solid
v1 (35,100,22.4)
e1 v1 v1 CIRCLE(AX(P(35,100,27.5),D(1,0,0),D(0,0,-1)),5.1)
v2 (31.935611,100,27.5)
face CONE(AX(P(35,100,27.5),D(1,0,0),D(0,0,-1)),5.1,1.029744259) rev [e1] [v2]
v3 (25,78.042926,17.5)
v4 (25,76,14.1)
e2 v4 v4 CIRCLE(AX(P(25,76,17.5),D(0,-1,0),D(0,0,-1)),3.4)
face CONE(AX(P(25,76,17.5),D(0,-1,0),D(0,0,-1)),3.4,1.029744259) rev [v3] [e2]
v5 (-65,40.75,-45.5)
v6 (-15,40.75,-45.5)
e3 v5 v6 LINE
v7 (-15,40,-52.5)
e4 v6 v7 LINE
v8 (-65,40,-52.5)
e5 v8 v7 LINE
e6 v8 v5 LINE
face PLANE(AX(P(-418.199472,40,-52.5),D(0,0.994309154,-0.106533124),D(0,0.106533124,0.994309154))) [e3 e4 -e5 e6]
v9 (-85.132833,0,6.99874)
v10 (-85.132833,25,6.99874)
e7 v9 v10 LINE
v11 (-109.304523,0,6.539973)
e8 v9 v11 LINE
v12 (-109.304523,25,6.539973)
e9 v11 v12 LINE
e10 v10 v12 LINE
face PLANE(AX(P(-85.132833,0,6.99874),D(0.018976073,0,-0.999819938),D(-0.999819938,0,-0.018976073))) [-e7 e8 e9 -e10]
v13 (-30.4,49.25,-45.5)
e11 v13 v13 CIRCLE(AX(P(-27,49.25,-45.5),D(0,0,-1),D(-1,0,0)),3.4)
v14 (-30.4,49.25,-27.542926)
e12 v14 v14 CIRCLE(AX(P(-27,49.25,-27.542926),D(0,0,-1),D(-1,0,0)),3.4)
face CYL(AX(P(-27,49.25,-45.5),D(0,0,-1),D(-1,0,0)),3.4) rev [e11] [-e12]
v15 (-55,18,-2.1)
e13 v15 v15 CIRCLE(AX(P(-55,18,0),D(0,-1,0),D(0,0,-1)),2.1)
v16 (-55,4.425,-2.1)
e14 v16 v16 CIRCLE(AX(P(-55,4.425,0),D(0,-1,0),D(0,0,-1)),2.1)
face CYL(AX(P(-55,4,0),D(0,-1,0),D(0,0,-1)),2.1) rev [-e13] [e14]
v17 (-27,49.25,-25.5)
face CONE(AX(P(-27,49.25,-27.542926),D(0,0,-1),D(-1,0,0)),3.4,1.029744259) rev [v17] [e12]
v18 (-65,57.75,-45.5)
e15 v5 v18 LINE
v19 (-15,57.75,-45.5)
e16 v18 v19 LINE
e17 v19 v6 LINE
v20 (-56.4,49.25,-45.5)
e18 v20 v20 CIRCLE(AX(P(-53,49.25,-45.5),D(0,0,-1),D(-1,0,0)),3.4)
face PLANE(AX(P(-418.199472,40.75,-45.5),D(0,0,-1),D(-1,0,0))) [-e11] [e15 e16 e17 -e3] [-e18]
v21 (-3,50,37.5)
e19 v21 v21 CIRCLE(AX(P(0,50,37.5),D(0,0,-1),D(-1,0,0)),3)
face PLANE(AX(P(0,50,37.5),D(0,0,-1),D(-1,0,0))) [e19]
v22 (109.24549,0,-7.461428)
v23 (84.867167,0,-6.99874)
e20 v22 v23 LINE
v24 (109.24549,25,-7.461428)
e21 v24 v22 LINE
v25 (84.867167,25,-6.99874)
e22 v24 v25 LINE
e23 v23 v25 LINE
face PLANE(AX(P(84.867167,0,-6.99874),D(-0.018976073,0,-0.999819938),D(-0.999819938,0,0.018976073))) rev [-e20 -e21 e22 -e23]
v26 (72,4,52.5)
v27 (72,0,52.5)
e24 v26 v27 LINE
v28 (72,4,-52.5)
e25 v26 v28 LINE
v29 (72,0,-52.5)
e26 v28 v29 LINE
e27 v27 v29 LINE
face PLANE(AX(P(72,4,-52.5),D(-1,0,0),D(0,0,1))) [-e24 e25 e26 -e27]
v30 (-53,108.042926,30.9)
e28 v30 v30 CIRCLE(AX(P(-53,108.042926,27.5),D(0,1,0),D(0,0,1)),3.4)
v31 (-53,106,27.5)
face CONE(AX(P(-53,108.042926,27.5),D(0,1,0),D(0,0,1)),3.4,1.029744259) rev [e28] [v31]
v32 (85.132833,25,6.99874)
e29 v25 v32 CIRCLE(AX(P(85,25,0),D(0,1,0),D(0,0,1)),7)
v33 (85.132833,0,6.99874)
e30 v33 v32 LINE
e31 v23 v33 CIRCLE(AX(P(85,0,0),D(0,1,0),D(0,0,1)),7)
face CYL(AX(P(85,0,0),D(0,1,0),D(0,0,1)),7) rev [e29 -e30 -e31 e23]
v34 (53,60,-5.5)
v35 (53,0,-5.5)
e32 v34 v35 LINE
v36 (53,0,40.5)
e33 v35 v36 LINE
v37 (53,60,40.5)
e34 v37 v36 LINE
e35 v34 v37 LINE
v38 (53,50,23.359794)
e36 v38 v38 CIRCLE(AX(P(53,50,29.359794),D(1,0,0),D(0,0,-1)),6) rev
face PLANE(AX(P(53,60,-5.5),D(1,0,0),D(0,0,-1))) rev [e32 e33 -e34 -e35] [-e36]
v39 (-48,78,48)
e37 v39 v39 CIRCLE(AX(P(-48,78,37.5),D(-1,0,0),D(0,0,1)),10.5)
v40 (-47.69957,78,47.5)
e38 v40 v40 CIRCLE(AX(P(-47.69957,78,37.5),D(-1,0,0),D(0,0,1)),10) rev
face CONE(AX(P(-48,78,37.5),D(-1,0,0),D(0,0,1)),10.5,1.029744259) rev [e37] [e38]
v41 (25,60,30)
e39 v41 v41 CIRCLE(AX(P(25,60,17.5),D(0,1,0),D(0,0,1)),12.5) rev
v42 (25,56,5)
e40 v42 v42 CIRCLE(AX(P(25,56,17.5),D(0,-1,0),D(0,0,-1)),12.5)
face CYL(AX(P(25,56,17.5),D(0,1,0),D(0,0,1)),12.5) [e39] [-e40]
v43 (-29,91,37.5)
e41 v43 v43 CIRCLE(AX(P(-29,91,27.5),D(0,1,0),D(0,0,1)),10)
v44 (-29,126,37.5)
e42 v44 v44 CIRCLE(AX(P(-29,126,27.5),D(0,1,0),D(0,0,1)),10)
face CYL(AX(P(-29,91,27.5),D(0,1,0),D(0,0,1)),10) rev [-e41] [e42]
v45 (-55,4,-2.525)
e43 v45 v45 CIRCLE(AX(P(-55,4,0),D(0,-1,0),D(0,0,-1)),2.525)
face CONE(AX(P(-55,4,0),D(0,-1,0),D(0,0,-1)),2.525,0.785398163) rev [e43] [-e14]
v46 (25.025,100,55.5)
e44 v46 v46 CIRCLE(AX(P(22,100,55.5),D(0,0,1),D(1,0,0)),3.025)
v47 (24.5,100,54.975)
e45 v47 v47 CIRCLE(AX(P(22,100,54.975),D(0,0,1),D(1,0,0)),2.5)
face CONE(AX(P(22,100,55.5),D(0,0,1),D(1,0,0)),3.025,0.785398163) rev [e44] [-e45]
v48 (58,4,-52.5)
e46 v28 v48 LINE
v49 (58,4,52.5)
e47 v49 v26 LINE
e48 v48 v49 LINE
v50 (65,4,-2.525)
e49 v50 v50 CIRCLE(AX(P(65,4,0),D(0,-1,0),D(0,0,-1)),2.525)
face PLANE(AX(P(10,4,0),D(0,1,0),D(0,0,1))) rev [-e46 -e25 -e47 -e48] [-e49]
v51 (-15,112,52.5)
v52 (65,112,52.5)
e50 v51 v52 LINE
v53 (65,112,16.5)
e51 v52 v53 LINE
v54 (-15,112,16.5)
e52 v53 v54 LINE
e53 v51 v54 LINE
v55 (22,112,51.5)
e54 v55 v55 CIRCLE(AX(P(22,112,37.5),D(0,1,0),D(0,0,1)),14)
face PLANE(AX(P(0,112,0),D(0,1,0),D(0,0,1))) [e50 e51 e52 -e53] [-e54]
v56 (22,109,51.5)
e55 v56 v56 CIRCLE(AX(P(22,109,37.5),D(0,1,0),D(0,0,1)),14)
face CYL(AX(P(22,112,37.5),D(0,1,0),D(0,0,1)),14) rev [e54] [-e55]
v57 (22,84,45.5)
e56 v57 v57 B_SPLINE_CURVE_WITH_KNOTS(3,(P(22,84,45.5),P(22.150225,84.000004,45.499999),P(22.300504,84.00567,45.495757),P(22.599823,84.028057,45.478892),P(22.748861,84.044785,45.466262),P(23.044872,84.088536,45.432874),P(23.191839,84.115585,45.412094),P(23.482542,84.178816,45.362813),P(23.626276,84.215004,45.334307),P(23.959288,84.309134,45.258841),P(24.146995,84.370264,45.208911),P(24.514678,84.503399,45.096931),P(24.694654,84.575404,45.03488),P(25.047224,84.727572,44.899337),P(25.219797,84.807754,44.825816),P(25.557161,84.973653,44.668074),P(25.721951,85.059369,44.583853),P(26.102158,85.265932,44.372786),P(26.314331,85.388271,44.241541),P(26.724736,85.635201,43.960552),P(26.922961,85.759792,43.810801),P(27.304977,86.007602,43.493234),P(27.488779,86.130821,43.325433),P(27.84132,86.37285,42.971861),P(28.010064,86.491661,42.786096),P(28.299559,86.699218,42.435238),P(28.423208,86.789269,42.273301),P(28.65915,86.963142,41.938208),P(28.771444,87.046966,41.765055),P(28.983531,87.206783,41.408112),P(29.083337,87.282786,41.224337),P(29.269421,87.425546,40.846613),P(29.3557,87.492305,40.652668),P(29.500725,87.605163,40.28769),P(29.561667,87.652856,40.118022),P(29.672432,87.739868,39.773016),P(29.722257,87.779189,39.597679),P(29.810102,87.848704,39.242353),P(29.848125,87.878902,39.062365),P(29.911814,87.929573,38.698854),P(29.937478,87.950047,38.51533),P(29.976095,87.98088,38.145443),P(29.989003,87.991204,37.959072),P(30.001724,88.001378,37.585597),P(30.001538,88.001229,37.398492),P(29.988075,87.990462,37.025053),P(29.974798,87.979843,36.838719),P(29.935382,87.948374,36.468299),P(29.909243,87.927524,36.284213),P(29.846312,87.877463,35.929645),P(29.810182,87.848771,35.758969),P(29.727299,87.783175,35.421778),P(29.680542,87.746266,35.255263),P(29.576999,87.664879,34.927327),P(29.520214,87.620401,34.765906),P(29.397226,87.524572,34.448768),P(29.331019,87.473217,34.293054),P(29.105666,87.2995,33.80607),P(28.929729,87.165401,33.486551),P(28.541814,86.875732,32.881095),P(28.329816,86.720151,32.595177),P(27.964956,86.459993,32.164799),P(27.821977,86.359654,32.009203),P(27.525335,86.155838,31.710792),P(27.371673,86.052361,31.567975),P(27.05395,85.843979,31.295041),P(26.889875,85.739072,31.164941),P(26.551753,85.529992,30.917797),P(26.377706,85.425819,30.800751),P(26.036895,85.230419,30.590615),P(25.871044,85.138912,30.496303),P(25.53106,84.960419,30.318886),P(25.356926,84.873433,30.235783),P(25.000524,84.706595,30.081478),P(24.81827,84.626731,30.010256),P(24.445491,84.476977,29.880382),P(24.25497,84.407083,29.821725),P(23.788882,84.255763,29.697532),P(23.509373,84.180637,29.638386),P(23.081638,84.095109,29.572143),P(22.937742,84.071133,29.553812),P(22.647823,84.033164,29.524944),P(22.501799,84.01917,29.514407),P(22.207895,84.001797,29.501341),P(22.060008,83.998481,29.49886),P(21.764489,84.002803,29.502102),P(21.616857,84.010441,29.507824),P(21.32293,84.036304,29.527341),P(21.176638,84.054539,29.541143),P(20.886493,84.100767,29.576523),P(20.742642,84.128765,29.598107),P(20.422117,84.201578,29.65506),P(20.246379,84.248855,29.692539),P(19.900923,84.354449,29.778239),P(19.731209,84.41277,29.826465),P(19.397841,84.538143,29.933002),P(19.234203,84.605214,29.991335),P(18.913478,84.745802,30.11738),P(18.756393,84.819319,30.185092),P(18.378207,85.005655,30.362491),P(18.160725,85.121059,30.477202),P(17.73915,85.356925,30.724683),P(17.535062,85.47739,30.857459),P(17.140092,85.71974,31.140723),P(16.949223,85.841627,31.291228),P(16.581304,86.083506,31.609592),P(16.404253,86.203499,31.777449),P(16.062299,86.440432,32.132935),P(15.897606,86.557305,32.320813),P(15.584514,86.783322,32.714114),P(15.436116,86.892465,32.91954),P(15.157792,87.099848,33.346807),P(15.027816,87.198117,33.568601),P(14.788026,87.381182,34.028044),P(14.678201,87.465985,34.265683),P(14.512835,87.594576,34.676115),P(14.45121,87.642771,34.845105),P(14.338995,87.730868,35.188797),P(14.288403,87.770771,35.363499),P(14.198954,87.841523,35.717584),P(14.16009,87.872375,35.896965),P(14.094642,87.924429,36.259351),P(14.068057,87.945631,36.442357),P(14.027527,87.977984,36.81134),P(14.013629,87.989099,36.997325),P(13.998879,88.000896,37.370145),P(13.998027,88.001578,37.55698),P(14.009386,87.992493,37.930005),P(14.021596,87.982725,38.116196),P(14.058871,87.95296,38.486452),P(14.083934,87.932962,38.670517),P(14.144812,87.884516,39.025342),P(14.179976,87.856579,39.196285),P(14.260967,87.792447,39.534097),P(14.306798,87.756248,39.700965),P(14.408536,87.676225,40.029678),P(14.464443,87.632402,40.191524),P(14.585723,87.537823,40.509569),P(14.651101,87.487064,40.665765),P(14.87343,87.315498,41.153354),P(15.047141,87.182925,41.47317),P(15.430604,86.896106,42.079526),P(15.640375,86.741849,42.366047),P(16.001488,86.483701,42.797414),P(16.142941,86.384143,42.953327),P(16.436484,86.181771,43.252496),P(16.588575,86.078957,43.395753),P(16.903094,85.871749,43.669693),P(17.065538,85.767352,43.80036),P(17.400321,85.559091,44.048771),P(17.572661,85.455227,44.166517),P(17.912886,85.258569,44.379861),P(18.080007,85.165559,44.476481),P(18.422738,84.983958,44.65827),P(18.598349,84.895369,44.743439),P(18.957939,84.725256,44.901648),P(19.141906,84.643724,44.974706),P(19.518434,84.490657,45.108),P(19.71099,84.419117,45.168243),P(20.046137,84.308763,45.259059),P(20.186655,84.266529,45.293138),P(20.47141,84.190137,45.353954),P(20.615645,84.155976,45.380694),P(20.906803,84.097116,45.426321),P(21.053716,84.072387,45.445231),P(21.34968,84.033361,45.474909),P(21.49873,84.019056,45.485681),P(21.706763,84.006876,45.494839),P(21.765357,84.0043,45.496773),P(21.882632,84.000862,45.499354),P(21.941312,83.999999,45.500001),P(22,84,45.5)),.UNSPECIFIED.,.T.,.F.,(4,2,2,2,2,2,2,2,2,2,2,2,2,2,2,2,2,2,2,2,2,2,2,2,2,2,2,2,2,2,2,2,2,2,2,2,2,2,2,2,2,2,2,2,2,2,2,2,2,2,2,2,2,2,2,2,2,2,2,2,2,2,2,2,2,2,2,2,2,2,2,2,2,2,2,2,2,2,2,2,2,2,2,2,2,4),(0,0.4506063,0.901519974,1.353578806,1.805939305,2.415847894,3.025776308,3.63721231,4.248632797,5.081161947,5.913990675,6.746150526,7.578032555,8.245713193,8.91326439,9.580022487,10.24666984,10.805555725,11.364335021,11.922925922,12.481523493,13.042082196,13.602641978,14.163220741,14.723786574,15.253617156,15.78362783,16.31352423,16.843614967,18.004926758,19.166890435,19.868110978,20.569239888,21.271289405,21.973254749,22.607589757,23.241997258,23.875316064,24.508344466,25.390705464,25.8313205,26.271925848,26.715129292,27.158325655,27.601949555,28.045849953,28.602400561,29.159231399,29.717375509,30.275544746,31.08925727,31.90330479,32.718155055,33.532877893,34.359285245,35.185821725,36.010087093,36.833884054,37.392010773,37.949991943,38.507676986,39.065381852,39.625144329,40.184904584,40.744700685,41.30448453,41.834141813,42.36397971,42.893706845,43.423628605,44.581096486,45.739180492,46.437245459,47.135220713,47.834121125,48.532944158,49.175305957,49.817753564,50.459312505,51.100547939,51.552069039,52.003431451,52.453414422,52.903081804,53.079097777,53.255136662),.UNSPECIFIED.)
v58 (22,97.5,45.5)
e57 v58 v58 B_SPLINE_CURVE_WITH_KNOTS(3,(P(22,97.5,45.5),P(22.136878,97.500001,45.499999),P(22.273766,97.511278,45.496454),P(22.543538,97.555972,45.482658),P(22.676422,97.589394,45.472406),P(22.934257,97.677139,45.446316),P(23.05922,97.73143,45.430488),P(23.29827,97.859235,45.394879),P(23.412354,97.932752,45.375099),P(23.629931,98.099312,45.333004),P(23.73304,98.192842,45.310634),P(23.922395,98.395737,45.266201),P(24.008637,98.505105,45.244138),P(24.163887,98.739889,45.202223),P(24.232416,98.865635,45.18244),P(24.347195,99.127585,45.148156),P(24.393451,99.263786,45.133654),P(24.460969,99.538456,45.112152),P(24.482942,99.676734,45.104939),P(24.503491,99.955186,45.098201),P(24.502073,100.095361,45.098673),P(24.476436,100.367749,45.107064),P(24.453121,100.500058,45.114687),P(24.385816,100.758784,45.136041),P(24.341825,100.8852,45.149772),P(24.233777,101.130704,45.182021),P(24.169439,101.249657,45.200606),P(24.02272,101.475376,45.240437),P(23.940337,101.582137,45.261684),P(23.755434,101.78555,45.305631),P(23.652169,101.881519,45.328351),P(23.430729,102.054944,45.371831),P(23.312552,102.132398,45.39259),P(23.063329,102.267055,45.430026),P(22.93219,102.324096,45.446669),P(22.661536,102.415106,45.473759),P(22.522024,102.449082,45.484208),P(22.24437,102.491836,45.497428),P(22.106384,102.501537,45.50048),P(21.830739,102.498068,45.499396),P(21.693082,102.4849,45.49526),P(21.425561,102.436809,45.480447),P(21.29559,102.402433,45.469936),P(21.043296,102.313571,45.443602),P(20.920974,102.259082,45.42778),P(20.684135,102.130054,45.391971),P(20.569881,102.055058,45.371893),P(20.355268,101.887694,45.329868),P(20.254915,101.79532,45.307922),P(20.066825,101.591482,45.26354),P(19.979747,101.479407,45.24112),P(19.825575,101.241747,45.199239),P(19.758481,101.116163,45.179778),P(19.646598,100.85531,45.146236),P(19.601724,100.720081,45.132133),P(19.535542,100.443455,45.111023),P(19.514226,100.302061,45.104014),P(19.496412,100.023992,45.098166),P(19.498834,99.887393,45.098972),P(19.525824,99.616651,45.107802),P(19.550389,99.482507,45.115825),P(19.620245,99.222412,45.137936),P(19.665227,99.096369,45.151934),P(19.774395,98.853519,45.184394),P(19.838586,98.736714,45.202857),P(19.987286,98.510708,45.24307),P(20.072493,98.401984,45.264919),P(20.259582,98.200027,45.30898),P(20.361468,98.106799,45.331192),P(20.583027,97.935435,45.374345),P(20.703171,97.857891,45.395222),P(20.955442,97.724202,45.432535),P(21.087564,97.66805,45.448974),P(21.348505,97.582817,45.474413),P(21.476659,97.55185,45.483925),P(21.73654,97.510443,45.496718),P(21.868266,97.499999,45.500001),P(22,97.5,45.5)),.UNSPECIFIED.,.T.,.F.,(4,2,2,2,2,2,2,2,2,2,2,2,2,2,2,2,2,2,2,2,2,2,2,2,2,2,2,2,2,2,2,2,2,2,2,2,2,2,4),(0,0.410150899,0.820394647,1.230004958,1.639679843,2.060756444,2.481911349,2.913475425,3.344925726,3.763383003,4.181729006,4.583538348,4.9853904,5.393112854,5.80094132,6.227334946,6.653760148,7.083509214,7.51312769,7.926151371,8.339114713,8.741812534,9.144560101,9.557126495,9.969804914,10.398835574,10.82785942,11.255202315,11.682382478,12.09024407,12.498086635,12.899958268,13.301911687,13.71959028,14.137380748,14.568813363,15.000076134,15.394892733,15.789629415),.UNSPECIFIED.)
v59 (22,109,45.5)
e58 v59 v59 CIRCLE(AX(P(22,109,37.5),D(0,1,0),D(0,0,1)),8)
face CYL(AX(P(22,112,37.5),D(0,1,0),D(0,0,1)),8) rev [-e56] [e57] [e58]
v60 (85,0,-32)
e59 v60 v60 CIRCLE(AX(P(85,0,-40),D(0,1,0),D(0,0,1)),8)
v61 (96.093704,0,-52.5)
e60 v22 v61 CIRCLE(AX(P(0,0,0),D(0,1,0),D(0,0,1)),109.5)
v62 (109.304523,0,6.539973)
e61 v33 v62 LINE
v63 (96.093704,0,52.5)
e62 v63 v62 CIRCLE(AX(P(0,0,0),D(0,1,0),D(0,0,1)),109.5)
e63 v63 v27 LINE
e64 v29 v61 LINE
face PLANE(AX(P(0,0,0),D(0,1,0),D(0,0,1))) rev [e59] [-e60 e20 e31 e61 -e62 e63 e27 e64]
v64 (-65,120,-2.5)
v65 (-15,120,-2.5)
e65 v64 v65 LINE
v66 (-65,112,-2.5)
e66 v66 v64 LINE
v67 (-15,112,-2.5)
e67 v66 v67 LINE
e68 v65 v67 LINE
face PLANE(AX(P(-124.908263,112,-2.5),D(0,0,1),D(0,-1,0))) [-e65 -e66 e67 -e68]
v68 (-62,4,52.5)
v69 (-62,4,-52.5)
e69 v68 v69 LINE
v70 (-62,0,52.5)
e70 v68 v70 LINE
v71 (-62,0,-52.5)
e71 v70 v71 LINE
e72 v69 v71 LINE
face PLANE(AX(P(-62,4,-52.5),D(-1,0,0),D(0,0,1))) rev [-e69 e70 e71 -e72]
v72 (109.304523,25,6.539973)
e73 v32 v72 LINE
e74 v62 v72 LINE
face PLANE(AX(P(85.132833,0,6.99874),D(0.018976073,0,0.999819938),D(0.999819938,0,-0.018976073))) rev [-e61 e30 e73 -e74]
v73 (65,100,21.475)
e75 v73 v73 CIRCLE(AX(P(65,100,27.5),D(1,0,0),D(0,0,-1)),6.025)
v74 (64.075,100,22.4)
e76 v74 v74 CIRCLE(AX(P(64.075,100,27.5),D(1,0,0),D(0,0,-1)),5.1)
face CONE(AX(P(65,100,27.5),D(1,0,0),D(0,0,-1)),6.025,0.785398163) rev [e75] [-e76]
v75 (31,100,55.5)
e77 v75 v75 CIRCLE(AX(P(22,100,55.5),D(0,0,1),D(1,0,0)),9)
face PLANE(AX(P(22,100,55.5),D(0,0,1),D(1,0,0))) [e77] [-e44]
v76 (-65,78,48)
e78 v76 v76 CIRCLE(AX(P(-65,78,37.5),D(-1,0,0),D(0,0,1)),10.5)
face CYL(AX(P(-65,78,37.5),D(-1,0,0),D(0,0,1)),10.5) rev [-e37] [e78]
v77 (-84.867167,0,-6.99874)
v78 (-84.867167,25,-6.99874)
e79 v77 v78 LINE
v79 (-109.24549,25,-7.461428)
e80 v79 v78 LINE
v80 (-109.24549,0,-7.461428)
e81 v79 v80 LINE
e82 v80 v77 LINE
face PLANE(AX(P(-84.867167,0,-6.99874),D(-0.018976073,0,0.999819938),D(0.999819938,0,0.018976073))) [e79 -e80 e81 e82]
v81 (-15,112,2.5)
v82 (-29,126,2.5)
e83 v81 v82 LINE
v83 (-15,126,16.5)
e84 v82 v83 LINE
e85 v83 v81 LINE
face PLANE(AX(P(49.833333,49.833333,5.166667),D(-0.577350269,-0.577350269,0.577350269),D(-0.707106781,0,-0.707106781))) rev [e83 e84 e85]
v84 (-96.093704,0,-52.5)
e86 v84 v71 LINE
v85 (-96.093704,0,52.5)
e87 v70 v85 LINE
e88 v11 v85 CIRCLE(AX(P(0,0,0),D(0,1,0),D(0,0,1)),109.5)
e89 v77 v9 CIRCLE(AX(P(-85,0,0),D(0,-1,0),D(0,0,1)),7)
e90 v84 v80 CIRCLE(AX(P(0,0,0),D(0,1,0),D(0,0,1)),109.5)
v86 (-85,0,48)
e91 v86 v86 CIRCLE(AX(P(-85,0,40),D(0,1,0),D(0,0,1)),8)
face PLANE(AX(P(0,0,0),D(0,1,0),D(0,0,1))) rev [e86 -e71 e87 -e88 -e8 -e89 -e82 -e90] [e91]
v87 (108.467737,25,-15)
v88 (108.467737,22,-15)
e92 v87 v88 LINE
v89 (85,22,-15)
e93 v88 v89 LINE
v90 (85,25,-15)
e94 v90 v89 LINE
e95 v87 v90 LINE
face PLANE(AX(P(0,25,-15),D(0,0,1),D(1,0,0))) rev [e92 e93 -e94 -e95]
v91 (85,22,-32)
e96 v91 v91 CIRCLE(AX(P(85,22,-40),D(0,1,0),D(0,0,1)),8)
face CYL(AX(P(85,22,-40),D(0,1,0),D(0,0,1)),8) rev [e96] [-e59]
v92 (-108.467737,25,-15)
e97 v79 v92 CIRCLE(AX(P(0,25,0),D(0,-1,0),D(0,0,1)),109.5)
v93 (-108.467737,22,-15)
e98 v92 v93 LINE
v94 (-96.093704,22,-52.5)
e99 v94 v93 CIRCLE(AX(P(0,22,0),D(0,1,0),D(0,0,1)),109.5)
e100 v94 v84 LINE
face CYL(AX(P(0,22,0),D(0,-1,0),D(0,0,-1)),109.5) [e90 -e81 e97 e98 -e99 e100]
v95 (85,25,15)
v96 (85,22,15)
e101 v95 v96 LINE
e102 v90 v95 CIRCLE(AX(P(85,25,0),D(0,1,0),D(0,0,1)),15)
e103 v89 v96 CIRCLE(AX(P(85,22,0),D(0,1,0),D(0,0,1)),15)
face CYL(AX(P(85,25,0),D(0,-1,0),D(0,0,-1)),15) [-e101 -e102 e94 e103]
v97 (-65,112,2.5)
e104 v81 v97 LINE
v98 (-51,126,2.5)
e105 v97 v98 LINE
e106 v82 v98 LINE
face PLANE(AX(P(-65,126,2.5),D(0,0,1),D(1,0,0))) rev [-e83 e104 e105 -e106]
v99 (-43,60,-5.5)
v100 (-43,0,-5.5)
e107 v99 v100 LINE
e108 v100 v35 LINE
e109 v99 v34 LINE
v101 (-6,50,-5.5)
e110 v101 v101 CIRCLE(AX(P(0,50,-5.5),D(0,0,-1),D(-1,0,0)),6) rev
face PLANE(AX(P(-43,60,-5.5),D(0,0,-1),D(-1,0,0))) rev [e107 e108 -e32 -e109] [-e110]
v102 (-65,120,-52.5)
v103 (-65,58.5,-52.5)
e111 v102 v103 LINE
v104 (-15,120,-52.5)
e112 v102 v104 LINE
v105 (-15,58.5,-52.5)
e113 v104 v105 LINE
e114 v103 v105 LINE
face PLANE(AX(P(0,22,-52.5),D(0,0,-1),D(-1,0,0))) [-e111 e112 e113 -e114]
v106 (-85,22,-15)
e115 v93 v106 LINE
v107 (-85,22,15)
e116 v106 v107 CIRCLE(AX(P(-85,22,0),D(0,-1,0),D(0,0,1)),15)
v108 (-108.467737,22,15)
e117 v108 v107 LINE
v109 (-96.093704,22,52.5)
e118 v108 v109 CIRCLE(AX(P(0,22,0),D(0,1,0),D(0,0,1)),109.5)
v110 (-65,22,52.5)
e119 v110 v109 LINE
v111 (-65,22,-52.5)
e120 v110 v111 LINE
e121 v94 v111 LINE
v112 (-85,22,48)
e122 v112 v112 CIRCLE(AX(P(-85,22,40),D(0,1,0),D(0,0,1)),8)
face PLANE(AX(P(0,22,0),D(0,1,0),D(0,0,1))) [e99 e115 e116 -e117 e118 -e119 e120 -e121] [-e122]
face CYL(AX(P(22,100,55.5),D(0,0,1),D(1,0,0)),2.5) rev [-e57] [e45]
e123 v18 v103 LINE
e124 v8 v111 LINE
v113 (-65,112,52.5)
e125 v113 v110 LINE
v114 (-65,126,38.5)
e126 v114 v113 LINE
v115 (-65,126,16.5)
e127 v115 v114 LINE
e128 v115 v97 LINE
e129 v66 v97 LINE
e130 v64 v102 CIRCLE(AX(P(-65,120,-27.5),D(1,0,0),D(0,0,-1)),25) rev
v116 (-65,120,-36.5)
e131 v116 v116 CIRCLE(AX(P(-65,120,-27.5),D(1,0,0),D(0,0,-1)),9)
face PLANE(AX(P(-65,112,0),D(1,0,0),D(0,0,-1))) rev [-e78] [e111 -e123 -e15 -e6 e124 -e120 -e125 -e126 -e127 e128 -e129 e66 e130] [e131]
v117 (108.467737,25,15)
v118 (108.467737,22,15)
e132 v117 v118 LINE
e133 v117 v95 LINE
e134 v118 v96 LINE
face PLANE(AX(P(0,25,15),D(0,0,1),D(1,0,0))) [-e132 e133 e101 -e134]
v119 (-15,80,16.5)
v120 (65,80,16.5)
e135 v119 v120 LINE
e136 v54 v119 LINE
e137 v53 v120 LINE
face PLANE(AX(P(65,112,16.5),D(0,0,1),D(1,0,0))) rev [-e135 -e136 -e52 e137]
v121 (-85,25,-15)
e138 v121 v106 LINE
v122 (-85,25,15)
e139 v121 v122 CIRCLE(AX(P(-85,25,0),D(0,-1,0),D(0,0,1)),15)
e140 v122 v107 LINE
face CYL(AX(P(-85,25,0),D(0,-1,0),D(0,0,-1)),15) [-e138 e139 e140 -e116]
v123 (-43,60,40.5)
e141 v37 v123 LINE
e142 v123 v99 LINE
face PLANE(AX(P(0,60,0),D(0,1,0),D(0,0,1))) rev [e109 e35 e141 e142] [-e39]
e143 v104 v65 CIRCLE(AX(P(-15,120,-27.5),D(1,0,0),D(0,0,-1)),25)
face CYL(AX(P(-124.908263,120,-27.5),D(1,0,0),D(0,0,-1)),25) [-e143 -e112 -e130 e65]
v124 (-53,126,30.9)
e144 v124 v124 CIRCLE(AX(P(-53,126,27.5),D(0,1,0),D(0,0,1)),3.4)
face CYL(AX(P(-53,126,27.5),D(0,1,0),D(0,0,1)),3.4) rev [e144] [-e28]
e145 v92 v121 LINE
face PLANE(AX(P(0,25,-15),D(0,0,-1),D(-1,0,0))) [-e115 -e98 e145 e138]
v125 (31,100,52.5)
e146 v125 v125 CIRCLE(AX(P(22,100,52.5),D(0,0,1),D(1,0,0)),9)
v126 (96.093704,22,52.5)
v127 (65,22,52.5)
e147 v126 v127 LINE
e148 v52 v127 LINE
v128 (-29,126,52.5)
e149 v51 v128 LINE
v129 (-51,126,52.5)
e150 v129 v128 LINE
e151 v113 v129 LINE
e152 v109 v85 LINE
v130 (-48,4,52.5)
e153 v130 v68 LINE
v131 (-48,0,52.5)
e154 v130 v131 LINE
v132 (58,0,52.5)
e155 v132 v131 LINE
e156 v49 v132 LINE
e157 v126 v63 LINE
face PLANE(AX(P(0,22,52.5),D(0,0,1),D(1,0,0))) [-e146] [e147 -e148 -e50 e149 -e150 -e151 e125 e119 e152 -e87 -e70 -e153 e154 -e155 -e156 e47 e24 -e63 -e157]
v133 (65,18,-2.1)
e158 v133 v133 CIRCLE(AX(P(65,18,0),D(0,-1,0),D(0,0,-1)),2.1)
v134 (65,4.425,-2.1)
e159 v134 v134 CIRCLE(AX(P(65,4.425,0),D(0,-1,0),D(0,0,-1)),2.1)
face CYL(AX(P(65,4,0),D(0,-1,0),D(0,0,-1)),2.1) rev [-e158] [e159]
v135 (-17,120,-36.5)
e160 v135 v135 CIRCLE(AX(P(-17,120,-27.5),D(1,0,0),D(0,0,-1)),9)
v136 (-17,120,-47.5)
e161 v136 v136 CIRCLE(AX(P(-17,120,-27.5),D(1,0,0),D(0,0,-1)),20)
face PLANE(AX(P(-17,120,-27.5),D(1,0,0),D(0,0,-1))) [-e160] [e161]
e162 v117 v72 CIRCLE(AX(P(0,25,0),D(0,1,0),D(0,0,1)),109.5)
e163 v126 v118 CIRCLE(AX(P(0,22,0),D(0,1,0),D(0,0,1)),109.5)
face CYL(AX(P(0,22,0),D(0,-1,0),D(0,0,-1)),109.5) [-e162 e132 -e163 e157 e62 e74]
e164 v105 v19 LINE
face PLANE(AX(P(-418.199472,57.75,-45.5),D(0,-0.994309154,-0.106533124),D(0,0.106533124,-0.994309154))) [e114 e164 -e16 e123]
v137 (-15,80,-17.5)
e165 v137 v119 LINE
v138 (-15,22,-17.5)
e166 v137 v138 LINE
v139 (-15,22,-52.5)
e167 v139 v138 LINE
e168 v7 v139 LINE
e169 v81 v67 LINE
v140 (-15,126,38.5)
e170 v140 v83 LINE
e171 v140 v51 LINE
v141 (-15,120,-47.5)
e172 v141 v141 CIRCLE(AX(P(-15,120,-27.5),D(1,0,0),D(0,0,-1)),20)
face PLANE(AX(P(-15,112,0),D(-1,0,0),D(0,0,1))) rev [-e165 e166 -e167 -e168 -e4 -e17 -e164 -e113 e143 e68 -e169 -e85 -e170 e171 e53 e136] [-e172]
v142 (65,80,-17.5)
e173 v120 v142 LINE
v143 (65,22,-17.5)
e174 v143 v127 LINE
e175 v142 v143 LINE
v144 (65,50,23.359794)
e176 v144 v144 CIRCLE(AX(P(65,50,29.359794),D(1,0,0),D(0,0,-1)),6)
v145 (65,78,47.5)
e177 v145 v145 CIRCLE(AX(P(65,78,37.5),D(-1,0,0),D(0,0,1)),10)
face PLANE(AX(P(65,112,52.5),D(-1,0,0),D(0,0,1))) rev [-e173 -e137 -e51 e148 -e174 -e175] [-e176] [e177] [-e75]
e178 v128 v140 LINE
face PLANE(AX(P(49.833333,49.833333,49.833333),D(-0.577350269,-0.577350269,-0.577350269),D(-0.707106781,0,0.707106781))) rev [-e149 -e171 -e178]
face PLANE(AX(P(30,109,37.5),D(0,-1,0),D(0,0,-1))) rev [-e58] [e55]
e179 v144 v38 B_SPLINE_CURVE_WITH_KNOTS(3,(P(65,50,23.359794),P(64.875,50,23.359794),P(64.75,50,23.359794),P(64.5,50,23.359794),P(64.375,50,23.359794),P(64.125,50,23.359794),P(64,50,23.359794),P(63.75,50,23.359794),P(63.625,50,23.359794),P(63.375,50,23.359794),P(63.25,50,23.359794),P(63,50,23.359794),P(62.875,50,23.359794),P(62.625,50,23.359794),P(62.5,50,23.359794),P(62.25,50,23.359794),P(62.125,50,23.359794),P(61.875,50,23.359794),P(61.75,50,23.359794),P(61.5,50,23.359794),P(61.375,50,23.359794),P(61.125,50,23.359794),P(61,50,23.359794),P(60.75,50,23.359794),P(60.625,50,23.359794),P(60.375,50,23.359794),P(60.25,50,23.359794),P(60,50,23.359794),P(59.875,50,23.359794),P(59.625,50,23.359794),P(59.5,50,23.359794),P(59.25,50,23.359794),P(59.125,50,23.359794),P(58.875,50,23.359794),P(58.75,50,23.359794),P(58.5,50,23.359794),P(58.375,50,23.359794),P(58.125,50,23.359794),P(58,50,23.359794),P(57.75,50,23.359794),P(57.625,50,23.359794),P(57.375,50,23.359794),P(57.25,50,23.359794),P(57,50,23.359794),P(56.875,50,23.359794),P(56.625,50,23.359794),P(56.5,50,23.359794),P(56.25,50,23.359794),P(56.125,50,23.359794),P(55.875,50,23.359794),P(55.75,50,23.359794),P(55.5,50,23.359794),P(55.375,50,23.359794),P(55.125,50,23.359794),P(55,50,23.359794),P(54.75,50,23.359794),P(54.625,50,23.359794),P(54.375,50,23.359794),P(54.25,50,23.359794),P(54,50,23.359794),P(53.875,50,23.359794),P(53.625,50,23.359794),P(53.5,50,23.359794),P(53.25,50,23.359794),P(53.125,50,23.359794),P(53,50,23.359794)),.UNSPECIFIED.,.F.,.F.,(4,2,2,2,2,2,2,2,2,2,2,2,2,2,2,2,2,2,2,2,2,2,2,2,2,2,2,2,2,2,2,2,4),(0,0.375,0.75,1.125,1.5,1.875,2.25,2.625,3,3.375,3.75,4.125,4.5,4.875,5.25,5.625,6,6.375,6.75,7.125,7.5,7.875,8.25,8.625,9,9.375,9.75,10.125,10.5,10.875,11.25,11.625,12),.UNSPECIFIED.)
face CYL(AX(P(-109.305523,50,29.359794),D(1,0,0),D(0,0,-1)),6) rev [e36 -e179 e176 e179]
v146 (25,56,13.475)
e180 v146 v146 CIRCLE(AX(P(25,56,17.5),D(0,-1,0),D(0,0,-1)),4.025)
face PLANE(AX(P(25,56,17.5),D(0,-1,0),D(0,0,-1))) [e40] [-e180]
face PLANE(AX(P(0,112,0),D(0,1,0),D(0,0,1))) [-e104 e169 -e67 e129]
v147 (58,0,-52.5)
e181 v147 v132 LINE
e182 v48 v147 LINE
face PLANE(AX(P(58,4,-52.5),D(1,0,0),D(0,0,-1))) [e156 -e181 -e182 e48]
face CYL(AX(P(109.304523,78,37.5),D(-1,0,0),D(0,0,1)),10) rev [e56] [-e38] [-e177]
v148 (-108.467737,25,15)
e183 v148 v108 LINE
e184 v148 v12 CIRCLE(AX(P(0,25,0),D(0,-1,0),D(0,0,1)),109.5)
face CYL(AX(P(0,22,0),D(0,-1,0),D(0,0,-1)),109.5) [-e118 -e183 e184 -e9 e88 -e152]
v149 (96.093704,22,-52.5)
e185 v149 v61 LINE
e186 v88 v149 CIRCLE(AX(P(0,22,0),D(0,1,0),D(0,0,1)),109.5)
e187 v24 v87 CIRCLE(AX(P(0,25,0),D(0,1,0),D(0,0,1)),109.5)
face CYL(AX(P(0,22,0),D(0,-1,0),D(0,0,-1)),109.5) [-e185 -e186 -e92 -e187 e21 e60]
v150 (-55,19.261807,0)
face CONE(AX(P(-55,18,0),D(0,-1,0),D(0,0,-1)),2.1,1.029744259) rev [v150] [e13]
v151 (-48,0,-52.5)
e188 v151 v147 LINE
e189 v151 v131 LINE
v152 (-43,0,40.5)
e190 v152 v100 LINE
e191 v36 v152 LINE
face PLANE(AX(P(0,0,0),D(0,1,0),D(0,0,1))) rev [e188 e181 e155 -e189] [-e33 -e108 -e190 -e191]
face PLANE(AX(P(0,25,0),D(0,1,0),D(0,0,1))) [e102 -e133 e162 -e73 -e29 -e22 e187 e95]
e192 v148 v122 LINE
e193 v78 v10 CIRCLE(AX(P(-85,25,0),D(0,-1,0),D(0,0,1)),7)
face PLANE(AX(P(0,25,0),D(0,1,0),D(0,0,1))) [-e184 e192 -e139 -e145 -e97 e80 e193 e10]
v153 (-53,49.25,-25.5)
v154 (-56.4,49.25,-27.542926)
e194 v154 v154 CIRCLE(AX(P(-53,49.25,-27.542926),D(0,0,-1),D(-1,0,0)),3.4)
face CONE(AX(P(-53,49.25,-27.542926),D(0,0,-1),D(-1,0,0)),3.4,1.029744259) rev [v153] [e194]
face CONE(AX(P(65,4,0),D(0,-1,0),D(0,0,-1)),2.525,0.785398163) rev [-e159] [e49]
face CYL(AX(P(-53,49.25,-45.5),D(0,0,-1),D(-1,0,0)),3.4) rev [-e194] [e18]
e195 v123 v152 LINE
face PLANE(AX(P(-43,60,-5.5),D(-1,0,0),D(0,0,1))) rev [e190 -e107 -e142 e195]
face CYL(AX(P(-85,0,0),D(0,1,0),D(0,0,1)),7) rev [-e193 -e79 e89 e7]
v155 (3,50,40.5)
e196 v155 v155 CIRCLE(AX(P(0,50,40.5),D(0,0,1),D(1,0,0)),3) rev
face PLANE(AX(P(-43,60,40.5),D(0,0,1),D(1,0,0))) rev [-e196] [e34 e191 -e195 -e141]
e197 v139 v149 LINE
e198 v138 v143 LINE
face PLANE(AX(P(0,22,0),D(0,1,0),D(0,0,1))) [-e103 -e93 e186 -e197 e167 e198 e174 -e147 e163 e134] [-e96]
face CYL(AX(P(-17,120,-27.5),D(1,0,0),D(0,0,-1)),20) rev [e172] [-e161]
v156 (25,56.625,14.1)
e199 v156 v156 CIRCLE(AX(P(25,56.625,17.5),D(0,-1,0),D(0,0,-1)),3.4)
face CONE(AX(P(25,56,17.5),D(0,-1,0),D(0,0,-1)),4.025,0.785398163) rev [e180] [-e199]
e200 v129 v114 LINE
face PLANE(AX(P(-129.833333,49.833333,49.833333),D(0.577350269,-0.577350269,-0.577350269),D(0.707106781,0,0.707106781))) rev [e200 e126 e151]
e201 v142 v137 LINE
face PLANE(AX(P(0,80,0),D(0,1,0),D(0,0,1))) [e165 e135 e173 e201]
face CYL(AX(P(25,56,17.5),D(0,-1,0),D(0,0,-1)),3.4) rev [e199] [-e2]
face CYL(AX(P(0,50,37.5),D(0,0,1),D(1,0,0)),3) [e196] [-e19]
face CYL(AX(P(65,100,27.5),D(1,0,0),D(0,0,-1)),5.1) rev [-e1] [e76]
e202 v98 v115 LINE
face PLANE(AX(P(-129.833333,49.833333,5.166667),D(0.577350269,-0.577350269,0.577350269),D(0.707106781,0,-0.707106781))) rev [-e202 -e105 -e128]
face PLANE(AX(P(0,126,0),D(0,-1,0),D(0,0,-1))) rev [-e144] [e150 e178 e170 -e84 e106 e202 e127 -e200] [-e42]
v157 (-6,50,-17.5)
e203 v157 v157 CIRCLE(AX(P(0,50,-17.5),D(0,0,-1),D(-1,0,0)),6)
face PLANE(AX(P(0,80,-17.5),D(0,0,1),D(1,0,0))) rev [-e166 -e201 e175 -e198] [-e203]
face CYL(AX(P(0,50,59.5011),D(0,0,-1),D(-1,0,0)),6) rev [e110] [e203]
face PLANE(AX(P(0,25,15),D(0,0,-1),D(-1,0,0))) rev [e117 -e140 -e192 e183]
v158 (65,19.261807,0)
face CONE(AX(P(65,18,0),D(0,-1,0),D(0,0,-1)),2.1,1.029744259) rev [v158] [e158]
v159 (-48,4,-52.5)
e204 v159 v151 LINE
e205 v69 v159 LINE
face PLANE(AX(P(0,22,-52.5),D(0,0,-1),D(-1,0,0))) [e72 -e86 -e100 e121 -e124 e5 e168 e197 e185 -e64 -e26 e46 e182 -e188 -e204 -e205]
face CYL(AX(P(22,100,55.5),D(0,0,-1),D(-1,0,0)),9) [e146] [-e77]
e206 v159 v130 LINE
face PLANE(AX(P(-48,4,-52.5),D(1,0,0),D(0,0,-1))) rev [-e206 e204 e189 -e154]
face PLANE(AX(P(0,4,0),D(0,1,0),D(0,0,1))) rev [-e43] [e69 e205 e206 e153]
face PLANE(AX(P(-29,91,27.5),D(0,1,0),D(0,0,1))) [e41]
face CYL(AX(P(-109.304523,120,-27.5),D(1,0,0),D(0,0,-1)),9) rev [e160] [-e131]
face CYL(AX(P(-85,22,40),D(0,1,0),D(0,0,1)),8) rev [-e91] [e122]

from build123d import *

# Parameters (mm, degrees)
EXTRUDE_1_DEPTH                           = 22
EXTRUDE_2_DEPTH                           = 3
CUT_EXTRUDE_1_DEPTH                       = 124.981853511
F_16_0MM_1_D                              = 16
SKETCH_6_W                                = 80
SKETCH_6_H                                = 36
EXTRUDE_3_DEPTH                           = 112
EXTRUDE_START                             = -22
SKETCH_7_W                                = 80
SKETCH_7_H                                = 34
EXTRUDE_4_DEPTH                           = 80
SKETCH_8_W                                = 50
SKETCH_8_H                                = 105
EXTRUDE_5_DEPTH                           = 112
SKETCH_9_W                                = 50
SKETCH_9_H                                = 50
EXTRUDE_6_DEPTH                           = 14
EXTRUDE_7_DEPTH                           = 50
SKETCH_11_R                               = 20
CUT_EXTRUDE_2_DEPTH                       = 2
SKETCH_12_R                               = 9
CUT_EXTRUDE_3_DEPTH                       = 200.334097768
CUT_EXTRUDE_4_DEPTH                       = 233.730137159
CUT_EXTRUDE_4_DEPTH_BACK                  = 233.730137159
HOLE_WIZARD_M24_1_D                       = 21
HOLE_WIZARD_M24_1_DEPTH                   = 17
HOLE_WIZARD_M24_1_TIP                     = 6.3090365
SKETCH_17_R                               = 10
CUT_EXTRUDE_5_DEPTH                       = 233.730137159
SKETCH_18_W                               = 96
SKETCH_18_H                               = 46
CUT_EXTRUDE_6_DEPTH                       = 60
LOFT_START                                = 86.313865244
LOFT_1_DEPTH                              = 8.686134756
MIRROR_START                              = 86.313865244
MIRROR_2_AT_THE_SECOND_PLANE_COPY_1_DEPTH = 8.686134756
HOLE_START                                = 83
HOLE_WIZARD_1_OUTLINE_R                   = 8
HOLE_WIZARD_1_DEPTH                       = 29
HOLE_START_2                              = 109
HOLE_WIZARD_1_2_OUTLINE_R                 = 14
HOLE_WIZARD_1_2_OUTLINE_R_2               = 8
HOLE_WIZARD_1_2_DEPTH                     = 3
SKETCH_24_R                               = 9
EXTRUDE_8_DEPTH                           = 3
HOLE_WIZARD_M12_1_D                       = 10.2
HOLE_WIZARD_M12_1_DEPTH                   = 30
HOLE_WIZARD_M12_1_CSINK_D                 = 12.05
HOLE_WIZARD_M12_1_CSINK_ANGLE             = 90
HOLE_WIZARD_M12_1_TIP                     = 3.064389157
SKETCH_30_R                               = 12.5
EXTRUDE_9_DEPTH                           = 4
HOLE_WIZARD_M8_1_D                        = 6.8
HOLE_WIZARD_M8_1_DEPTH                    = 20
HOLE_WIZARD_M8_1_CSINK_D                  = 8.05
HOLE_WIZARD_M8_1_CSINK_ANGLE              = 90
HOLE_WIZARD_M8_1_TIP                      = 2.042926105
SKETCH_34_R                               = 3
EXTRUDE_10_DEPTH                          = 3
CUT_EXTRUDE_7_REACH                       = 197.708
SKETCH_35_R                               = 6
SKETCH_39_W                               = 14
SKETCH_39_H                               = 105
CUT_EXTRUDE_9_DEPTH                       = 4
CUT_EXTRUDE_10_REACH                      = 235.425
SKETCH_44_R                               = 6
HOLE_WIZARD_M8_2_D                        = 6.8
HOLE_WIZARD_M8_2_DEPTH                    = 17.957073895
HOLE_WIZARD_M8_2_TIP                      = 2.042926105
SKETCH_47_R                               = 10
CUT_EXTRUDE_11_DEPTH                      = 35
HOLE_WIZARD_M8_3_D                        = 6.8
HOLE_WIZARD_M8_3_DEPTH                    = 17.957073895
HOLE_WIZARD_M8_3_TIP                      = 2.042926105


with BuildPart() as part:
    # 草图1 → 凸台-拉伸1 (new body)
    with BuildSketch(Plane(origin=(0, 0, 0), x_dir=(1, 0, 0), z_dir=(0, 1, 0))):
        with BuildLine():
            Line((96.093704268, 52.5), (-96.093704268, 52.5))
            ThreePointArc((-96.093704268, 52.5), (-109.5, 0), (-96.093704268, -52.5))
            Line((-96.093704268, -52.5), (96.093704268, -52.5))
            Line((96.093704268, -52.5), (96.093704268, 52.5))
        make_face()
        with BuildLine():
            ThreePointArc((109.5, 0), (106.095500888, 27.092336394), (96.093704268, 52.5))
            Line((96.093704268, 52.5), (96.093704268, -52.5))
            ThreePointArc((96.093704268, -52.5), (106.095500888, -27.092336394), (109.5, 0))
        make_face()
    extrude(amount=EXTRUDE_1_DEPTH)

    # 草图2 → 凸台-拉伸2 (add)
    with BuildSketch(Plane(origin=(0, 22, 0), x_dir=(1, 0, 0), z_dir=(0, 1, 0))):
        with BuildLine():
            Line((85, -15), (108.467737139, -15))
            ThreePointArc((108.467737139, -15), (109.5, 0), (108.467737139, 15))
            Line((108.467737139, 15), (85, 15))
            ThreePointArc((85, 15), (70, 0), (85, -15))
        make_face()
    extrude_2 = extrude(amount=EXTRUDE_2_DEPTH)

    # 草图3 → 切除-拉伸1 (cut, through all)
    with BuildSketch(Plane(origin=(0, 25, 0), x_dir=(1, 0, 0), z_dir=(0, 1, 0))):
        with BuildLine():
            Line((84.867167486, 6.998739567), (135.101585821, 7.952163249))
            ThreePointArc((135.101585821, 7.952163249), (142.233157901, 1.086256196), (135.367250848, -6.045315884))
            Line((135.367250848, -6.045315884), (85.132832514, -6.998739567))
            ThreePointArc((85.132832514, -6.998739567), (78.001260433, -0.132832514), (84.867167486, 6.998739567))
        make_face()
    cut_extrude_1 = extrude(amount=-CUT_EXTRUDE_1_DEPTH, mode=Mode.SUBTRACT)

    # 镜向1: 凸台-拉伸2, 切除-拉伸1 across plane
    add(extrude_2.mirror(Plane(origin=(0, 0, 0), x_dir=(0, 0, 1), z_dir=(1, 0, 0))))
    add(cut_extrude_1.mirror(Plane(origin=(0, 0, 0), x_dir=(0, 0, 1), z_dir=(1, 0, 0))), mode=Mode.SUBTRACT)

    # Ø16.0mm 暗销孔1 (through all)
    with Locations(Plane(origin=(0, 22, 0), x_dir=(1, 0, 0), z_dir=(0, 1, 0))):
        with Locations((-85, -40), (85, 40)):
            Hole(F_16_0MM_1_D / 2)

    # 草图6 → 凸台-拉伸3 (add)
    with BuildSketch(Plane(origin=(0, 0, 0), x_dir=(1, 0, 0), z_dir=(0, 1, 0))):
        with Locations((25, -34.5)):
            Rectangle(SKETCH_6_W, SKETCH_6_H)
    extrude(amount=EXTRUDE_3_DEPTH)

    # 草图7 → 凸台-拉伸4 (add)
    with BuildSketch(Plane(origin=(0, 22, 0), x_dir=(1, 0, 0), z_dir=(0, 1, 0)).offset(EXTRUDE_START)):
        with Locations((25, 0.5)):
            Rectangle(SKETCH_7_W, SKETCH_7_H)
    extrude(amount=EXTRUDE_4_DEPTH)

    # 草图8 → 凸台-拉伸5 (add)
    with BuildSketch(Plane(origin=(0, 22, 0), x_dir=(1, 0, 0), z_dir=(0, 1, 0)).offset(EXTRUDE_START)):
        with Locations((-40, 0)):
            Rectangle(SKETCH_8_W, SKETCH_8_H)
    extrude(amount=EXTRUDE_5_DEPTH)

    # 草图9 → 凸台-拉伸6 (add)
    with BuildSketch(Plane(origin=(0, 112, 0), x_dir=(1, 0, 0), z_dir=(0, 1, 0))):
        with Locations((-40, -27.5)):
            Rectangle(SKETCH_9_W, SKETCH_9_H)
    extrude(amount=EXTRUDE_6_DEPTH)

    # 草图10 → 凸台-拉伸7 (add)
    with BuildSketch(Plane(origin=(-15, 0, 0), x_dir=(0, 0, -1), z_dir=(1, 0, 0))):
        with BuildLine():
            Line((52.5, 112), (2.5, 112))
            Line((2.5, 112), (2.5, 120))
            ThreePointArc((2.5, 120), (27.5, 145), (52.5, 120))
            Line((52.5, 120), (52.5, 112))
        make_face()
    extrude(amount=-EXTRUDE_7_DEPTH)

    # 草图11 → 切除-拉伸2 (cut)
    with BuildSketch(Plane(origin=(-15, 0, 0), x_dir=(0, 0, -1), z_dir=(1, 0, 0))):
        with Locations((27.5, 120)):
            Circle(SKETCH_11_R)
    extrude(amount=-CUT_EXTRUDE_2_DEPTH, mode=Mode.SUBTRACT)

    # 草图12 → 切除-拉伸3 (cut, through all)
    with BuildSketch(Plane(origin=(-17, 0, 0), x_dir=(0, 0, -1), z_dir=(1, 0, 0))):
        with Locations((27.5, 120)):
            Circle(SKETCH_12_R)
    extrude(amount=-CUT_EXTRUDE_3_DEPTH, mode=Mode.SUBTRACT)

    # 草图13 → 切除-拉伸4 (cut, two sides: drawn at the far end of the back side and taken through both)
    with BuildSketch(Plane.ZY.offset(65).offset(-CUT_EXTRUDE_4_DEPTH_BACK)):
        Polygon((-357.737844579, 7.295945224), (-52.5, 40), (-45.5, 40.75), (-45.5, 57.75), (-52.5, 58.5), (-357.737844579, 91.204054776), (-971.707540776, 91.204054776), (-971.707540776, 7.295945224), align=None)
    extrude(amount=CUT_EXTRUDE_4_DEPTH + CUT_EXTRUDE_4_DEPTH_BACK, mode=Mode.SUBTRACT)

    # M24 螺纹孔1
    with Locations(Plane.ZY.offset(65)):
        with Locations((37.5, 78)):
            Hole(HOLE_WIZARD_M24_1_D / 2, depth=HOLE_WIZARD_M24_1_DEPTH)
            with Locations((0, 0, -(HOLE_WIZARD_M24_1_DEPTH + HOLE_WIZARD_M24_1_TIP / 2))):  # 118° drill point
                Cone(0, HOLE_WIZARD_M24_1_D / 2, HOLE_WIZARD_M24_1_TIP, mode=Mode.SUBTRACT)

    # 草图17 → 切除-拉伸5 (cut, through all)
    with BuildSketch(Plane.ZY.offset(65)):
        with Locations((37.5, 78)):
            Circle(SKETCH_17_R)
    extrude(amount=-CUT_EXTRUDE_5_DEPTH, mode=Mode.SUBTRACT)

    # 草图18 → 切除-拉伸6 (cut)
    with BuildSketch(Plane.XZ):
        with Locations((5, 17.5)):
            Rectangle(SKETCH_18_W, SKETCH_18_H)
    extrude(amount=-CUT_EXTRUDE_6_DEPTH, mode=Mode.SUBTRACT)

    # 切除-放样1: read off the stored shape, not the designer's step
    # 切除-放样1 outline → 切除-放样1 (cut)
    with BuildSketch(Plane(origin=(0, 0, 0), x_dir=(0.8164965809277258, -0.40824829046386313, -0.40824829046386313), z_dir=(0.5773502691896258, 0.5773502691896258, 0.5773502691896258)).offset(LOFT_START)):
        Polygon((-96.550720695, 51.972348417), (-79.404292495, 42.072853481), (-79.404292495, 61.871843354), align=None)
    loft_1 = extrude(amount=LOFT_1_DEPTH, mode=Mode.SUBTRACT)

    # 镜向2: 切除-放样1 across plane
    add(loft_1.mirror(Plane.ZY.offset(40)), mode=Mode.SUBTRACT)

    # 镜向2 at the second plane: 切除-放样1 across plane
    add(loft_1.mirror(Plane(origin=(0, 0, 27.5), x_dir=(1, 0, 0), z_dir=(0, 0, -1))), mode=Mode.SUBTRACT)

    # 镜向2 at the second plane copy 1 sket → 镜向2 at the second plane copy 1 (cut)
    with BuildSketch(Plane(origin=(-80, 0, 55), x_dir=(-0.816496580927726, -0.40824829046386313, 0.4082482904638627), z_dir=(-0.5773502691896255, 0.5773502691896258, -0.5773502691896262)).offset(MIRROR_START)):
        Polygon((-96.550720695, 51.972348417), (-79.404292495, 42.072853481), (-79.404292495, 61.871843354), align=None)
    extrude(amount=MIRROR_2_AT_THE_SECOND_PLANE_COPY_1_DEPTH, mode=Mode.SUBTRACT)

    # 孔1: read off the stored shape, not the designer's step
    # 孔1 outline → 孔1 (cut)
    with BuildSketch(Plane(origin=(0, 0, 0), x_dir=(1, 0, 0), z_dir=(0, 1, 0)).offset(HOLE_START)):
        with Locations((22, -37.5)):
            Circle(HOLE_WIZARD_1_OUTLINE_R)
    extrude(amount=HOLE_WIZARD_1_DEPTH, mode=Mode.SUBTRACT)

    # Hole Wizard 1 2 outline → Hole Wizard 1 2 (cut)
    with BuildSketch(Plane(origin=(0, 0, 0), x_dir=(1, 0, 0), z_dir=(0, 1, 0)).offset(HOLE_START_2)):
        with Locations((22, -37.5)):
            Circle(HOLE_WIZARD_1_2_OUTLINE_R)
        with Locations((22, -37.5)):
            Circle(HOLE_WIZARD_1_2_OUTLINE_R_2, mode=Mode.SUBTRACT)
    extrude(amount=HOLE_WIZARD_1_2_DEPTH, mode=Mode.SUBTRACT)

    # 草图24 → 凸台-拉伸8 (add)
    with BuildSketch(Plane.XY.offset(52.5)):
        with Locations((22, 100)):
            Circle(SKETCH_24_R)
    extrude(amount=EXTRUDE_8_DEPTH)

    # M6 螺纹孔1: read off the stored shape, not the designer's step
    # M6 螺纹孔1 outline → M6 螺纹孔1 (revolve, cut)
    with BuildSketch(Plane(origin=(22, 100, 0), x_dir=(1, 0, 0), z_dir=(0, -1, 0))):
        Polygon((0, 45.099172166), (2.5, 45.099172166), (2.5, 54.975), (3.025, 55.5), (0, 55.5), align=None)
    revolve(axis=Axis((22, 100, 0), (0, 0, 1)), mode=Mode.SUBTRACT)

    # M12 螺纹孔1
    with Locations(Plane(origin=(65, 0, 0), x_dir=(0, 0, -1), z_dir=(1, 0, 0))):
        with Locations((-27.5, 100)):
            CounterSinkHole(HOLE_WIZARD_M12_1_D / 2, HOLE_WIZARD_M12_1_CSINK_D / 2, depth=HOLE_WIZARD_M12_1_DEPTH, counter_sink_angle=HOLE_WIZARD_M12_1_CSINK_ANGLE)
            with Locations((0, 0, -(HOLE_WIZARD_M12_1_DEPTH + HOLE_WIZARD_M12_1_TIP / 2))):  # 118° drill point
                Cone(0, HOLE_WIZARD_M12_1_D / 2, HOLE_WIZARD_M12_1_TIP, mode=Mode.SUBTRACT)

    # 草图30 → 凸台-拉伸9 (add)
    with BuildSketch(Plane.XZ.offset(-60)):
        with Locations(Location((25, 17.5, 0), (0, 0, 90))):
            Circle(SKETCH_30_R)
    extrude(amount=EXTRUDE_9_DEPTH)

    # M8 螺纹孔1
    with Locations(Plane(origin=(0, 56, 0), x_dir=(-1, 0, 0), z_dir=(0, -1, 0))):
        with Locations((-25, -17.5)):
            CounterSinkHole(HOLE_WIZARD_M8_1_D / 2, HOLE_WIZARD_M8_1_CSINK_D / 2, depth=HOLE_WIZARD_M8_1_DEPTH, counter_sink_angle=HOLE_WIZARD_M8_1_CSINK_ANGLE)
            with Locations((0, 0, -(HOLE_WIZARD_M8_1_DEPTH + HOLE_WIZARD_M8_1_TIP / 2))):  # 118° drill point
                Cone(0, HOLE_WIZARD_M8_1_D / 2, HOLE_WIZARD_M8_1_TIP, mode=Mode.SUBTRACT)

    # 草图34 → 凸台-拉伸10 (add)
    with BuildSketch(Plane(origin=(0, 0, 40.5), x_dir=(-1, 0, 0), z_dir=(0, 0, -1))):
        with Locations(Location((0, 50, 0), (0, 0, 180))):
            Circle(SKETCH_34_R)
    extrude(amount=EXTRUDE_10_DEPTH)

    # 草图35 → 切除-拉伸7 (cut, up to next)
    with BuildSketch(Plane(origin=(0, 0, -17.5), x_dir=(-1, 0, 0), z_dir=(0, 0, -1)), mode=Mode.PRIVATE) as cut_extrude_7_sk1:
        with Locations((0, 50)):
            Circle(SKETCH_35_R)
    cut_extrude_7_tool1 = extrude(cut_extrude_7_sk1.sketch, amount=-CUT_EXTRUDE_7_REACH, mode=Mode.PRIVATE) & part.part
    add(cut_extrude_7_tool1.solids().sort_by_distance((0, 50, -17.5))[0], mode=Mode.SUBTRACT)

    # 草图39 → 切除-拉伸9 (cut)
    with BuildSketch(Plane.XZ):
        with Locations((-55, 0)):
            Rectangle(SKETCH_39_W, SKETCH_39_H)
    cut_extrude_9 = extrude(amount=-CUT_EXTRUDE_9_DEPTH, mode=Mode.SUBTRACT)

    # 草图43 → M5 螺纹孔2 (revolve, cut)
    with BuildSketch(Plane(origin=(-55, 4, 0), x_dir=(0, 0, -1), z_dir=(1, 0, 0))):
        Polygon((0, 0), (0, 15.2618073), (2.1, 14), (2.1, 0.425), (2.525, 0), align=None)
    hole_wizard_m5_2 = revolve(axis=Axis((-55, -2.35, 0), (0, 1, 0)), mode=Mode.SUBTRACT)

    # 镜向5: 切除-拉伸9, M5 螺纹孔2 across plane
    add(cut_extrude_9.mirror(Plane.ZY.offset(-5)), mode=Mode.SUBTRACT)
    add(hole_wizard_m5_2.mirror(Plane.ZY.offset(-5)), mode=Mode.SUBTRACT)

    # 草图44 → 切除-拉伸10 (cut, up to next)
    with BuildSketch(Plane(origin=(65, 0, 0), x_dir=(0, 0, -1), z_dir=(1, 0, 0)), mode=Mode.PRIVATE) as cut_extrude_10_sk1:
        with Locations((-29.359794418, 50)):
            Circle(SKETCH_44_R)
    cut_extrude_10_tool1 = extrude(cut_extrude_10_sk1.sketch, amount=-CUT_EXTRUDE_10_REACH, mode=Mode.PRIVATE) & part.part
    add(cut_extrude_10_tool1.solids().sort_by_distance((65, 50, 29.359794))[0], mode=Mode.SUBTRACT)

    # M8 螺纹孔2
    with Locations(Plane(origin=(0, 126, 0), x_dir=(1, 0, 0), z_dir=(0, 1, 0))):
        with Locations((-53, -27.5)):
            Hole(HOLE_WIZARD_M8_2_D / 2, depth=HOLE_WIZARD_M8_2_DEPTH)
            with Locations((0, 0, -(HOLE_WIZARD_M8_2_DEPTH + HOLE_WIZARD_M8_2_TIP / 2))):  # 118° drill point
                Cone(0, HOLE_WIZARD_M8_2_D / 2, HOLE_WIZARD_M8_2_TIP, mode=Mode.SUBTRACT)

    # 草图47 → 切除-拉伸11 (cut)
    with BuildSketch(Plane(origin=(0, 126, 0), x_dir=(1, 0, 0), z_dir=(0, 1, 0))):
        with Locations(Location((-29, -27.5, 0), (0, 0, 270))):
            Circle(SKETCH_47_R)
    extrude(amount=-CUT_EXTRUDE_11_DEPTH, mode=Mode.SUBTRACT)

    # M8 螺纹孔3
    with Locations(Plane(origin=(0, 0, -45.5), x_dir=(-1, 0, 0), z_dir=(0, 0, -1))):
        with Locations((53, 49.25), (27, 49.25)):
            Hole(HOLE_WIZARD_M8_3_D / 2, depth=HOLE_WIZARD_M8_3_DEPTH)
            with Locations((0, 0, -(HOLE_WIZARD_M8_3_DEPTH + HOLE_WIZARD_M8_3_TIP / 2))):  # 118° drill point
                Cone(0, HOLE_WIZARD_M8_3_D / 2, HOLE_WIZARD_M8_3_TIP, mode=Mode.SUBTRACT)


solid = part.part
